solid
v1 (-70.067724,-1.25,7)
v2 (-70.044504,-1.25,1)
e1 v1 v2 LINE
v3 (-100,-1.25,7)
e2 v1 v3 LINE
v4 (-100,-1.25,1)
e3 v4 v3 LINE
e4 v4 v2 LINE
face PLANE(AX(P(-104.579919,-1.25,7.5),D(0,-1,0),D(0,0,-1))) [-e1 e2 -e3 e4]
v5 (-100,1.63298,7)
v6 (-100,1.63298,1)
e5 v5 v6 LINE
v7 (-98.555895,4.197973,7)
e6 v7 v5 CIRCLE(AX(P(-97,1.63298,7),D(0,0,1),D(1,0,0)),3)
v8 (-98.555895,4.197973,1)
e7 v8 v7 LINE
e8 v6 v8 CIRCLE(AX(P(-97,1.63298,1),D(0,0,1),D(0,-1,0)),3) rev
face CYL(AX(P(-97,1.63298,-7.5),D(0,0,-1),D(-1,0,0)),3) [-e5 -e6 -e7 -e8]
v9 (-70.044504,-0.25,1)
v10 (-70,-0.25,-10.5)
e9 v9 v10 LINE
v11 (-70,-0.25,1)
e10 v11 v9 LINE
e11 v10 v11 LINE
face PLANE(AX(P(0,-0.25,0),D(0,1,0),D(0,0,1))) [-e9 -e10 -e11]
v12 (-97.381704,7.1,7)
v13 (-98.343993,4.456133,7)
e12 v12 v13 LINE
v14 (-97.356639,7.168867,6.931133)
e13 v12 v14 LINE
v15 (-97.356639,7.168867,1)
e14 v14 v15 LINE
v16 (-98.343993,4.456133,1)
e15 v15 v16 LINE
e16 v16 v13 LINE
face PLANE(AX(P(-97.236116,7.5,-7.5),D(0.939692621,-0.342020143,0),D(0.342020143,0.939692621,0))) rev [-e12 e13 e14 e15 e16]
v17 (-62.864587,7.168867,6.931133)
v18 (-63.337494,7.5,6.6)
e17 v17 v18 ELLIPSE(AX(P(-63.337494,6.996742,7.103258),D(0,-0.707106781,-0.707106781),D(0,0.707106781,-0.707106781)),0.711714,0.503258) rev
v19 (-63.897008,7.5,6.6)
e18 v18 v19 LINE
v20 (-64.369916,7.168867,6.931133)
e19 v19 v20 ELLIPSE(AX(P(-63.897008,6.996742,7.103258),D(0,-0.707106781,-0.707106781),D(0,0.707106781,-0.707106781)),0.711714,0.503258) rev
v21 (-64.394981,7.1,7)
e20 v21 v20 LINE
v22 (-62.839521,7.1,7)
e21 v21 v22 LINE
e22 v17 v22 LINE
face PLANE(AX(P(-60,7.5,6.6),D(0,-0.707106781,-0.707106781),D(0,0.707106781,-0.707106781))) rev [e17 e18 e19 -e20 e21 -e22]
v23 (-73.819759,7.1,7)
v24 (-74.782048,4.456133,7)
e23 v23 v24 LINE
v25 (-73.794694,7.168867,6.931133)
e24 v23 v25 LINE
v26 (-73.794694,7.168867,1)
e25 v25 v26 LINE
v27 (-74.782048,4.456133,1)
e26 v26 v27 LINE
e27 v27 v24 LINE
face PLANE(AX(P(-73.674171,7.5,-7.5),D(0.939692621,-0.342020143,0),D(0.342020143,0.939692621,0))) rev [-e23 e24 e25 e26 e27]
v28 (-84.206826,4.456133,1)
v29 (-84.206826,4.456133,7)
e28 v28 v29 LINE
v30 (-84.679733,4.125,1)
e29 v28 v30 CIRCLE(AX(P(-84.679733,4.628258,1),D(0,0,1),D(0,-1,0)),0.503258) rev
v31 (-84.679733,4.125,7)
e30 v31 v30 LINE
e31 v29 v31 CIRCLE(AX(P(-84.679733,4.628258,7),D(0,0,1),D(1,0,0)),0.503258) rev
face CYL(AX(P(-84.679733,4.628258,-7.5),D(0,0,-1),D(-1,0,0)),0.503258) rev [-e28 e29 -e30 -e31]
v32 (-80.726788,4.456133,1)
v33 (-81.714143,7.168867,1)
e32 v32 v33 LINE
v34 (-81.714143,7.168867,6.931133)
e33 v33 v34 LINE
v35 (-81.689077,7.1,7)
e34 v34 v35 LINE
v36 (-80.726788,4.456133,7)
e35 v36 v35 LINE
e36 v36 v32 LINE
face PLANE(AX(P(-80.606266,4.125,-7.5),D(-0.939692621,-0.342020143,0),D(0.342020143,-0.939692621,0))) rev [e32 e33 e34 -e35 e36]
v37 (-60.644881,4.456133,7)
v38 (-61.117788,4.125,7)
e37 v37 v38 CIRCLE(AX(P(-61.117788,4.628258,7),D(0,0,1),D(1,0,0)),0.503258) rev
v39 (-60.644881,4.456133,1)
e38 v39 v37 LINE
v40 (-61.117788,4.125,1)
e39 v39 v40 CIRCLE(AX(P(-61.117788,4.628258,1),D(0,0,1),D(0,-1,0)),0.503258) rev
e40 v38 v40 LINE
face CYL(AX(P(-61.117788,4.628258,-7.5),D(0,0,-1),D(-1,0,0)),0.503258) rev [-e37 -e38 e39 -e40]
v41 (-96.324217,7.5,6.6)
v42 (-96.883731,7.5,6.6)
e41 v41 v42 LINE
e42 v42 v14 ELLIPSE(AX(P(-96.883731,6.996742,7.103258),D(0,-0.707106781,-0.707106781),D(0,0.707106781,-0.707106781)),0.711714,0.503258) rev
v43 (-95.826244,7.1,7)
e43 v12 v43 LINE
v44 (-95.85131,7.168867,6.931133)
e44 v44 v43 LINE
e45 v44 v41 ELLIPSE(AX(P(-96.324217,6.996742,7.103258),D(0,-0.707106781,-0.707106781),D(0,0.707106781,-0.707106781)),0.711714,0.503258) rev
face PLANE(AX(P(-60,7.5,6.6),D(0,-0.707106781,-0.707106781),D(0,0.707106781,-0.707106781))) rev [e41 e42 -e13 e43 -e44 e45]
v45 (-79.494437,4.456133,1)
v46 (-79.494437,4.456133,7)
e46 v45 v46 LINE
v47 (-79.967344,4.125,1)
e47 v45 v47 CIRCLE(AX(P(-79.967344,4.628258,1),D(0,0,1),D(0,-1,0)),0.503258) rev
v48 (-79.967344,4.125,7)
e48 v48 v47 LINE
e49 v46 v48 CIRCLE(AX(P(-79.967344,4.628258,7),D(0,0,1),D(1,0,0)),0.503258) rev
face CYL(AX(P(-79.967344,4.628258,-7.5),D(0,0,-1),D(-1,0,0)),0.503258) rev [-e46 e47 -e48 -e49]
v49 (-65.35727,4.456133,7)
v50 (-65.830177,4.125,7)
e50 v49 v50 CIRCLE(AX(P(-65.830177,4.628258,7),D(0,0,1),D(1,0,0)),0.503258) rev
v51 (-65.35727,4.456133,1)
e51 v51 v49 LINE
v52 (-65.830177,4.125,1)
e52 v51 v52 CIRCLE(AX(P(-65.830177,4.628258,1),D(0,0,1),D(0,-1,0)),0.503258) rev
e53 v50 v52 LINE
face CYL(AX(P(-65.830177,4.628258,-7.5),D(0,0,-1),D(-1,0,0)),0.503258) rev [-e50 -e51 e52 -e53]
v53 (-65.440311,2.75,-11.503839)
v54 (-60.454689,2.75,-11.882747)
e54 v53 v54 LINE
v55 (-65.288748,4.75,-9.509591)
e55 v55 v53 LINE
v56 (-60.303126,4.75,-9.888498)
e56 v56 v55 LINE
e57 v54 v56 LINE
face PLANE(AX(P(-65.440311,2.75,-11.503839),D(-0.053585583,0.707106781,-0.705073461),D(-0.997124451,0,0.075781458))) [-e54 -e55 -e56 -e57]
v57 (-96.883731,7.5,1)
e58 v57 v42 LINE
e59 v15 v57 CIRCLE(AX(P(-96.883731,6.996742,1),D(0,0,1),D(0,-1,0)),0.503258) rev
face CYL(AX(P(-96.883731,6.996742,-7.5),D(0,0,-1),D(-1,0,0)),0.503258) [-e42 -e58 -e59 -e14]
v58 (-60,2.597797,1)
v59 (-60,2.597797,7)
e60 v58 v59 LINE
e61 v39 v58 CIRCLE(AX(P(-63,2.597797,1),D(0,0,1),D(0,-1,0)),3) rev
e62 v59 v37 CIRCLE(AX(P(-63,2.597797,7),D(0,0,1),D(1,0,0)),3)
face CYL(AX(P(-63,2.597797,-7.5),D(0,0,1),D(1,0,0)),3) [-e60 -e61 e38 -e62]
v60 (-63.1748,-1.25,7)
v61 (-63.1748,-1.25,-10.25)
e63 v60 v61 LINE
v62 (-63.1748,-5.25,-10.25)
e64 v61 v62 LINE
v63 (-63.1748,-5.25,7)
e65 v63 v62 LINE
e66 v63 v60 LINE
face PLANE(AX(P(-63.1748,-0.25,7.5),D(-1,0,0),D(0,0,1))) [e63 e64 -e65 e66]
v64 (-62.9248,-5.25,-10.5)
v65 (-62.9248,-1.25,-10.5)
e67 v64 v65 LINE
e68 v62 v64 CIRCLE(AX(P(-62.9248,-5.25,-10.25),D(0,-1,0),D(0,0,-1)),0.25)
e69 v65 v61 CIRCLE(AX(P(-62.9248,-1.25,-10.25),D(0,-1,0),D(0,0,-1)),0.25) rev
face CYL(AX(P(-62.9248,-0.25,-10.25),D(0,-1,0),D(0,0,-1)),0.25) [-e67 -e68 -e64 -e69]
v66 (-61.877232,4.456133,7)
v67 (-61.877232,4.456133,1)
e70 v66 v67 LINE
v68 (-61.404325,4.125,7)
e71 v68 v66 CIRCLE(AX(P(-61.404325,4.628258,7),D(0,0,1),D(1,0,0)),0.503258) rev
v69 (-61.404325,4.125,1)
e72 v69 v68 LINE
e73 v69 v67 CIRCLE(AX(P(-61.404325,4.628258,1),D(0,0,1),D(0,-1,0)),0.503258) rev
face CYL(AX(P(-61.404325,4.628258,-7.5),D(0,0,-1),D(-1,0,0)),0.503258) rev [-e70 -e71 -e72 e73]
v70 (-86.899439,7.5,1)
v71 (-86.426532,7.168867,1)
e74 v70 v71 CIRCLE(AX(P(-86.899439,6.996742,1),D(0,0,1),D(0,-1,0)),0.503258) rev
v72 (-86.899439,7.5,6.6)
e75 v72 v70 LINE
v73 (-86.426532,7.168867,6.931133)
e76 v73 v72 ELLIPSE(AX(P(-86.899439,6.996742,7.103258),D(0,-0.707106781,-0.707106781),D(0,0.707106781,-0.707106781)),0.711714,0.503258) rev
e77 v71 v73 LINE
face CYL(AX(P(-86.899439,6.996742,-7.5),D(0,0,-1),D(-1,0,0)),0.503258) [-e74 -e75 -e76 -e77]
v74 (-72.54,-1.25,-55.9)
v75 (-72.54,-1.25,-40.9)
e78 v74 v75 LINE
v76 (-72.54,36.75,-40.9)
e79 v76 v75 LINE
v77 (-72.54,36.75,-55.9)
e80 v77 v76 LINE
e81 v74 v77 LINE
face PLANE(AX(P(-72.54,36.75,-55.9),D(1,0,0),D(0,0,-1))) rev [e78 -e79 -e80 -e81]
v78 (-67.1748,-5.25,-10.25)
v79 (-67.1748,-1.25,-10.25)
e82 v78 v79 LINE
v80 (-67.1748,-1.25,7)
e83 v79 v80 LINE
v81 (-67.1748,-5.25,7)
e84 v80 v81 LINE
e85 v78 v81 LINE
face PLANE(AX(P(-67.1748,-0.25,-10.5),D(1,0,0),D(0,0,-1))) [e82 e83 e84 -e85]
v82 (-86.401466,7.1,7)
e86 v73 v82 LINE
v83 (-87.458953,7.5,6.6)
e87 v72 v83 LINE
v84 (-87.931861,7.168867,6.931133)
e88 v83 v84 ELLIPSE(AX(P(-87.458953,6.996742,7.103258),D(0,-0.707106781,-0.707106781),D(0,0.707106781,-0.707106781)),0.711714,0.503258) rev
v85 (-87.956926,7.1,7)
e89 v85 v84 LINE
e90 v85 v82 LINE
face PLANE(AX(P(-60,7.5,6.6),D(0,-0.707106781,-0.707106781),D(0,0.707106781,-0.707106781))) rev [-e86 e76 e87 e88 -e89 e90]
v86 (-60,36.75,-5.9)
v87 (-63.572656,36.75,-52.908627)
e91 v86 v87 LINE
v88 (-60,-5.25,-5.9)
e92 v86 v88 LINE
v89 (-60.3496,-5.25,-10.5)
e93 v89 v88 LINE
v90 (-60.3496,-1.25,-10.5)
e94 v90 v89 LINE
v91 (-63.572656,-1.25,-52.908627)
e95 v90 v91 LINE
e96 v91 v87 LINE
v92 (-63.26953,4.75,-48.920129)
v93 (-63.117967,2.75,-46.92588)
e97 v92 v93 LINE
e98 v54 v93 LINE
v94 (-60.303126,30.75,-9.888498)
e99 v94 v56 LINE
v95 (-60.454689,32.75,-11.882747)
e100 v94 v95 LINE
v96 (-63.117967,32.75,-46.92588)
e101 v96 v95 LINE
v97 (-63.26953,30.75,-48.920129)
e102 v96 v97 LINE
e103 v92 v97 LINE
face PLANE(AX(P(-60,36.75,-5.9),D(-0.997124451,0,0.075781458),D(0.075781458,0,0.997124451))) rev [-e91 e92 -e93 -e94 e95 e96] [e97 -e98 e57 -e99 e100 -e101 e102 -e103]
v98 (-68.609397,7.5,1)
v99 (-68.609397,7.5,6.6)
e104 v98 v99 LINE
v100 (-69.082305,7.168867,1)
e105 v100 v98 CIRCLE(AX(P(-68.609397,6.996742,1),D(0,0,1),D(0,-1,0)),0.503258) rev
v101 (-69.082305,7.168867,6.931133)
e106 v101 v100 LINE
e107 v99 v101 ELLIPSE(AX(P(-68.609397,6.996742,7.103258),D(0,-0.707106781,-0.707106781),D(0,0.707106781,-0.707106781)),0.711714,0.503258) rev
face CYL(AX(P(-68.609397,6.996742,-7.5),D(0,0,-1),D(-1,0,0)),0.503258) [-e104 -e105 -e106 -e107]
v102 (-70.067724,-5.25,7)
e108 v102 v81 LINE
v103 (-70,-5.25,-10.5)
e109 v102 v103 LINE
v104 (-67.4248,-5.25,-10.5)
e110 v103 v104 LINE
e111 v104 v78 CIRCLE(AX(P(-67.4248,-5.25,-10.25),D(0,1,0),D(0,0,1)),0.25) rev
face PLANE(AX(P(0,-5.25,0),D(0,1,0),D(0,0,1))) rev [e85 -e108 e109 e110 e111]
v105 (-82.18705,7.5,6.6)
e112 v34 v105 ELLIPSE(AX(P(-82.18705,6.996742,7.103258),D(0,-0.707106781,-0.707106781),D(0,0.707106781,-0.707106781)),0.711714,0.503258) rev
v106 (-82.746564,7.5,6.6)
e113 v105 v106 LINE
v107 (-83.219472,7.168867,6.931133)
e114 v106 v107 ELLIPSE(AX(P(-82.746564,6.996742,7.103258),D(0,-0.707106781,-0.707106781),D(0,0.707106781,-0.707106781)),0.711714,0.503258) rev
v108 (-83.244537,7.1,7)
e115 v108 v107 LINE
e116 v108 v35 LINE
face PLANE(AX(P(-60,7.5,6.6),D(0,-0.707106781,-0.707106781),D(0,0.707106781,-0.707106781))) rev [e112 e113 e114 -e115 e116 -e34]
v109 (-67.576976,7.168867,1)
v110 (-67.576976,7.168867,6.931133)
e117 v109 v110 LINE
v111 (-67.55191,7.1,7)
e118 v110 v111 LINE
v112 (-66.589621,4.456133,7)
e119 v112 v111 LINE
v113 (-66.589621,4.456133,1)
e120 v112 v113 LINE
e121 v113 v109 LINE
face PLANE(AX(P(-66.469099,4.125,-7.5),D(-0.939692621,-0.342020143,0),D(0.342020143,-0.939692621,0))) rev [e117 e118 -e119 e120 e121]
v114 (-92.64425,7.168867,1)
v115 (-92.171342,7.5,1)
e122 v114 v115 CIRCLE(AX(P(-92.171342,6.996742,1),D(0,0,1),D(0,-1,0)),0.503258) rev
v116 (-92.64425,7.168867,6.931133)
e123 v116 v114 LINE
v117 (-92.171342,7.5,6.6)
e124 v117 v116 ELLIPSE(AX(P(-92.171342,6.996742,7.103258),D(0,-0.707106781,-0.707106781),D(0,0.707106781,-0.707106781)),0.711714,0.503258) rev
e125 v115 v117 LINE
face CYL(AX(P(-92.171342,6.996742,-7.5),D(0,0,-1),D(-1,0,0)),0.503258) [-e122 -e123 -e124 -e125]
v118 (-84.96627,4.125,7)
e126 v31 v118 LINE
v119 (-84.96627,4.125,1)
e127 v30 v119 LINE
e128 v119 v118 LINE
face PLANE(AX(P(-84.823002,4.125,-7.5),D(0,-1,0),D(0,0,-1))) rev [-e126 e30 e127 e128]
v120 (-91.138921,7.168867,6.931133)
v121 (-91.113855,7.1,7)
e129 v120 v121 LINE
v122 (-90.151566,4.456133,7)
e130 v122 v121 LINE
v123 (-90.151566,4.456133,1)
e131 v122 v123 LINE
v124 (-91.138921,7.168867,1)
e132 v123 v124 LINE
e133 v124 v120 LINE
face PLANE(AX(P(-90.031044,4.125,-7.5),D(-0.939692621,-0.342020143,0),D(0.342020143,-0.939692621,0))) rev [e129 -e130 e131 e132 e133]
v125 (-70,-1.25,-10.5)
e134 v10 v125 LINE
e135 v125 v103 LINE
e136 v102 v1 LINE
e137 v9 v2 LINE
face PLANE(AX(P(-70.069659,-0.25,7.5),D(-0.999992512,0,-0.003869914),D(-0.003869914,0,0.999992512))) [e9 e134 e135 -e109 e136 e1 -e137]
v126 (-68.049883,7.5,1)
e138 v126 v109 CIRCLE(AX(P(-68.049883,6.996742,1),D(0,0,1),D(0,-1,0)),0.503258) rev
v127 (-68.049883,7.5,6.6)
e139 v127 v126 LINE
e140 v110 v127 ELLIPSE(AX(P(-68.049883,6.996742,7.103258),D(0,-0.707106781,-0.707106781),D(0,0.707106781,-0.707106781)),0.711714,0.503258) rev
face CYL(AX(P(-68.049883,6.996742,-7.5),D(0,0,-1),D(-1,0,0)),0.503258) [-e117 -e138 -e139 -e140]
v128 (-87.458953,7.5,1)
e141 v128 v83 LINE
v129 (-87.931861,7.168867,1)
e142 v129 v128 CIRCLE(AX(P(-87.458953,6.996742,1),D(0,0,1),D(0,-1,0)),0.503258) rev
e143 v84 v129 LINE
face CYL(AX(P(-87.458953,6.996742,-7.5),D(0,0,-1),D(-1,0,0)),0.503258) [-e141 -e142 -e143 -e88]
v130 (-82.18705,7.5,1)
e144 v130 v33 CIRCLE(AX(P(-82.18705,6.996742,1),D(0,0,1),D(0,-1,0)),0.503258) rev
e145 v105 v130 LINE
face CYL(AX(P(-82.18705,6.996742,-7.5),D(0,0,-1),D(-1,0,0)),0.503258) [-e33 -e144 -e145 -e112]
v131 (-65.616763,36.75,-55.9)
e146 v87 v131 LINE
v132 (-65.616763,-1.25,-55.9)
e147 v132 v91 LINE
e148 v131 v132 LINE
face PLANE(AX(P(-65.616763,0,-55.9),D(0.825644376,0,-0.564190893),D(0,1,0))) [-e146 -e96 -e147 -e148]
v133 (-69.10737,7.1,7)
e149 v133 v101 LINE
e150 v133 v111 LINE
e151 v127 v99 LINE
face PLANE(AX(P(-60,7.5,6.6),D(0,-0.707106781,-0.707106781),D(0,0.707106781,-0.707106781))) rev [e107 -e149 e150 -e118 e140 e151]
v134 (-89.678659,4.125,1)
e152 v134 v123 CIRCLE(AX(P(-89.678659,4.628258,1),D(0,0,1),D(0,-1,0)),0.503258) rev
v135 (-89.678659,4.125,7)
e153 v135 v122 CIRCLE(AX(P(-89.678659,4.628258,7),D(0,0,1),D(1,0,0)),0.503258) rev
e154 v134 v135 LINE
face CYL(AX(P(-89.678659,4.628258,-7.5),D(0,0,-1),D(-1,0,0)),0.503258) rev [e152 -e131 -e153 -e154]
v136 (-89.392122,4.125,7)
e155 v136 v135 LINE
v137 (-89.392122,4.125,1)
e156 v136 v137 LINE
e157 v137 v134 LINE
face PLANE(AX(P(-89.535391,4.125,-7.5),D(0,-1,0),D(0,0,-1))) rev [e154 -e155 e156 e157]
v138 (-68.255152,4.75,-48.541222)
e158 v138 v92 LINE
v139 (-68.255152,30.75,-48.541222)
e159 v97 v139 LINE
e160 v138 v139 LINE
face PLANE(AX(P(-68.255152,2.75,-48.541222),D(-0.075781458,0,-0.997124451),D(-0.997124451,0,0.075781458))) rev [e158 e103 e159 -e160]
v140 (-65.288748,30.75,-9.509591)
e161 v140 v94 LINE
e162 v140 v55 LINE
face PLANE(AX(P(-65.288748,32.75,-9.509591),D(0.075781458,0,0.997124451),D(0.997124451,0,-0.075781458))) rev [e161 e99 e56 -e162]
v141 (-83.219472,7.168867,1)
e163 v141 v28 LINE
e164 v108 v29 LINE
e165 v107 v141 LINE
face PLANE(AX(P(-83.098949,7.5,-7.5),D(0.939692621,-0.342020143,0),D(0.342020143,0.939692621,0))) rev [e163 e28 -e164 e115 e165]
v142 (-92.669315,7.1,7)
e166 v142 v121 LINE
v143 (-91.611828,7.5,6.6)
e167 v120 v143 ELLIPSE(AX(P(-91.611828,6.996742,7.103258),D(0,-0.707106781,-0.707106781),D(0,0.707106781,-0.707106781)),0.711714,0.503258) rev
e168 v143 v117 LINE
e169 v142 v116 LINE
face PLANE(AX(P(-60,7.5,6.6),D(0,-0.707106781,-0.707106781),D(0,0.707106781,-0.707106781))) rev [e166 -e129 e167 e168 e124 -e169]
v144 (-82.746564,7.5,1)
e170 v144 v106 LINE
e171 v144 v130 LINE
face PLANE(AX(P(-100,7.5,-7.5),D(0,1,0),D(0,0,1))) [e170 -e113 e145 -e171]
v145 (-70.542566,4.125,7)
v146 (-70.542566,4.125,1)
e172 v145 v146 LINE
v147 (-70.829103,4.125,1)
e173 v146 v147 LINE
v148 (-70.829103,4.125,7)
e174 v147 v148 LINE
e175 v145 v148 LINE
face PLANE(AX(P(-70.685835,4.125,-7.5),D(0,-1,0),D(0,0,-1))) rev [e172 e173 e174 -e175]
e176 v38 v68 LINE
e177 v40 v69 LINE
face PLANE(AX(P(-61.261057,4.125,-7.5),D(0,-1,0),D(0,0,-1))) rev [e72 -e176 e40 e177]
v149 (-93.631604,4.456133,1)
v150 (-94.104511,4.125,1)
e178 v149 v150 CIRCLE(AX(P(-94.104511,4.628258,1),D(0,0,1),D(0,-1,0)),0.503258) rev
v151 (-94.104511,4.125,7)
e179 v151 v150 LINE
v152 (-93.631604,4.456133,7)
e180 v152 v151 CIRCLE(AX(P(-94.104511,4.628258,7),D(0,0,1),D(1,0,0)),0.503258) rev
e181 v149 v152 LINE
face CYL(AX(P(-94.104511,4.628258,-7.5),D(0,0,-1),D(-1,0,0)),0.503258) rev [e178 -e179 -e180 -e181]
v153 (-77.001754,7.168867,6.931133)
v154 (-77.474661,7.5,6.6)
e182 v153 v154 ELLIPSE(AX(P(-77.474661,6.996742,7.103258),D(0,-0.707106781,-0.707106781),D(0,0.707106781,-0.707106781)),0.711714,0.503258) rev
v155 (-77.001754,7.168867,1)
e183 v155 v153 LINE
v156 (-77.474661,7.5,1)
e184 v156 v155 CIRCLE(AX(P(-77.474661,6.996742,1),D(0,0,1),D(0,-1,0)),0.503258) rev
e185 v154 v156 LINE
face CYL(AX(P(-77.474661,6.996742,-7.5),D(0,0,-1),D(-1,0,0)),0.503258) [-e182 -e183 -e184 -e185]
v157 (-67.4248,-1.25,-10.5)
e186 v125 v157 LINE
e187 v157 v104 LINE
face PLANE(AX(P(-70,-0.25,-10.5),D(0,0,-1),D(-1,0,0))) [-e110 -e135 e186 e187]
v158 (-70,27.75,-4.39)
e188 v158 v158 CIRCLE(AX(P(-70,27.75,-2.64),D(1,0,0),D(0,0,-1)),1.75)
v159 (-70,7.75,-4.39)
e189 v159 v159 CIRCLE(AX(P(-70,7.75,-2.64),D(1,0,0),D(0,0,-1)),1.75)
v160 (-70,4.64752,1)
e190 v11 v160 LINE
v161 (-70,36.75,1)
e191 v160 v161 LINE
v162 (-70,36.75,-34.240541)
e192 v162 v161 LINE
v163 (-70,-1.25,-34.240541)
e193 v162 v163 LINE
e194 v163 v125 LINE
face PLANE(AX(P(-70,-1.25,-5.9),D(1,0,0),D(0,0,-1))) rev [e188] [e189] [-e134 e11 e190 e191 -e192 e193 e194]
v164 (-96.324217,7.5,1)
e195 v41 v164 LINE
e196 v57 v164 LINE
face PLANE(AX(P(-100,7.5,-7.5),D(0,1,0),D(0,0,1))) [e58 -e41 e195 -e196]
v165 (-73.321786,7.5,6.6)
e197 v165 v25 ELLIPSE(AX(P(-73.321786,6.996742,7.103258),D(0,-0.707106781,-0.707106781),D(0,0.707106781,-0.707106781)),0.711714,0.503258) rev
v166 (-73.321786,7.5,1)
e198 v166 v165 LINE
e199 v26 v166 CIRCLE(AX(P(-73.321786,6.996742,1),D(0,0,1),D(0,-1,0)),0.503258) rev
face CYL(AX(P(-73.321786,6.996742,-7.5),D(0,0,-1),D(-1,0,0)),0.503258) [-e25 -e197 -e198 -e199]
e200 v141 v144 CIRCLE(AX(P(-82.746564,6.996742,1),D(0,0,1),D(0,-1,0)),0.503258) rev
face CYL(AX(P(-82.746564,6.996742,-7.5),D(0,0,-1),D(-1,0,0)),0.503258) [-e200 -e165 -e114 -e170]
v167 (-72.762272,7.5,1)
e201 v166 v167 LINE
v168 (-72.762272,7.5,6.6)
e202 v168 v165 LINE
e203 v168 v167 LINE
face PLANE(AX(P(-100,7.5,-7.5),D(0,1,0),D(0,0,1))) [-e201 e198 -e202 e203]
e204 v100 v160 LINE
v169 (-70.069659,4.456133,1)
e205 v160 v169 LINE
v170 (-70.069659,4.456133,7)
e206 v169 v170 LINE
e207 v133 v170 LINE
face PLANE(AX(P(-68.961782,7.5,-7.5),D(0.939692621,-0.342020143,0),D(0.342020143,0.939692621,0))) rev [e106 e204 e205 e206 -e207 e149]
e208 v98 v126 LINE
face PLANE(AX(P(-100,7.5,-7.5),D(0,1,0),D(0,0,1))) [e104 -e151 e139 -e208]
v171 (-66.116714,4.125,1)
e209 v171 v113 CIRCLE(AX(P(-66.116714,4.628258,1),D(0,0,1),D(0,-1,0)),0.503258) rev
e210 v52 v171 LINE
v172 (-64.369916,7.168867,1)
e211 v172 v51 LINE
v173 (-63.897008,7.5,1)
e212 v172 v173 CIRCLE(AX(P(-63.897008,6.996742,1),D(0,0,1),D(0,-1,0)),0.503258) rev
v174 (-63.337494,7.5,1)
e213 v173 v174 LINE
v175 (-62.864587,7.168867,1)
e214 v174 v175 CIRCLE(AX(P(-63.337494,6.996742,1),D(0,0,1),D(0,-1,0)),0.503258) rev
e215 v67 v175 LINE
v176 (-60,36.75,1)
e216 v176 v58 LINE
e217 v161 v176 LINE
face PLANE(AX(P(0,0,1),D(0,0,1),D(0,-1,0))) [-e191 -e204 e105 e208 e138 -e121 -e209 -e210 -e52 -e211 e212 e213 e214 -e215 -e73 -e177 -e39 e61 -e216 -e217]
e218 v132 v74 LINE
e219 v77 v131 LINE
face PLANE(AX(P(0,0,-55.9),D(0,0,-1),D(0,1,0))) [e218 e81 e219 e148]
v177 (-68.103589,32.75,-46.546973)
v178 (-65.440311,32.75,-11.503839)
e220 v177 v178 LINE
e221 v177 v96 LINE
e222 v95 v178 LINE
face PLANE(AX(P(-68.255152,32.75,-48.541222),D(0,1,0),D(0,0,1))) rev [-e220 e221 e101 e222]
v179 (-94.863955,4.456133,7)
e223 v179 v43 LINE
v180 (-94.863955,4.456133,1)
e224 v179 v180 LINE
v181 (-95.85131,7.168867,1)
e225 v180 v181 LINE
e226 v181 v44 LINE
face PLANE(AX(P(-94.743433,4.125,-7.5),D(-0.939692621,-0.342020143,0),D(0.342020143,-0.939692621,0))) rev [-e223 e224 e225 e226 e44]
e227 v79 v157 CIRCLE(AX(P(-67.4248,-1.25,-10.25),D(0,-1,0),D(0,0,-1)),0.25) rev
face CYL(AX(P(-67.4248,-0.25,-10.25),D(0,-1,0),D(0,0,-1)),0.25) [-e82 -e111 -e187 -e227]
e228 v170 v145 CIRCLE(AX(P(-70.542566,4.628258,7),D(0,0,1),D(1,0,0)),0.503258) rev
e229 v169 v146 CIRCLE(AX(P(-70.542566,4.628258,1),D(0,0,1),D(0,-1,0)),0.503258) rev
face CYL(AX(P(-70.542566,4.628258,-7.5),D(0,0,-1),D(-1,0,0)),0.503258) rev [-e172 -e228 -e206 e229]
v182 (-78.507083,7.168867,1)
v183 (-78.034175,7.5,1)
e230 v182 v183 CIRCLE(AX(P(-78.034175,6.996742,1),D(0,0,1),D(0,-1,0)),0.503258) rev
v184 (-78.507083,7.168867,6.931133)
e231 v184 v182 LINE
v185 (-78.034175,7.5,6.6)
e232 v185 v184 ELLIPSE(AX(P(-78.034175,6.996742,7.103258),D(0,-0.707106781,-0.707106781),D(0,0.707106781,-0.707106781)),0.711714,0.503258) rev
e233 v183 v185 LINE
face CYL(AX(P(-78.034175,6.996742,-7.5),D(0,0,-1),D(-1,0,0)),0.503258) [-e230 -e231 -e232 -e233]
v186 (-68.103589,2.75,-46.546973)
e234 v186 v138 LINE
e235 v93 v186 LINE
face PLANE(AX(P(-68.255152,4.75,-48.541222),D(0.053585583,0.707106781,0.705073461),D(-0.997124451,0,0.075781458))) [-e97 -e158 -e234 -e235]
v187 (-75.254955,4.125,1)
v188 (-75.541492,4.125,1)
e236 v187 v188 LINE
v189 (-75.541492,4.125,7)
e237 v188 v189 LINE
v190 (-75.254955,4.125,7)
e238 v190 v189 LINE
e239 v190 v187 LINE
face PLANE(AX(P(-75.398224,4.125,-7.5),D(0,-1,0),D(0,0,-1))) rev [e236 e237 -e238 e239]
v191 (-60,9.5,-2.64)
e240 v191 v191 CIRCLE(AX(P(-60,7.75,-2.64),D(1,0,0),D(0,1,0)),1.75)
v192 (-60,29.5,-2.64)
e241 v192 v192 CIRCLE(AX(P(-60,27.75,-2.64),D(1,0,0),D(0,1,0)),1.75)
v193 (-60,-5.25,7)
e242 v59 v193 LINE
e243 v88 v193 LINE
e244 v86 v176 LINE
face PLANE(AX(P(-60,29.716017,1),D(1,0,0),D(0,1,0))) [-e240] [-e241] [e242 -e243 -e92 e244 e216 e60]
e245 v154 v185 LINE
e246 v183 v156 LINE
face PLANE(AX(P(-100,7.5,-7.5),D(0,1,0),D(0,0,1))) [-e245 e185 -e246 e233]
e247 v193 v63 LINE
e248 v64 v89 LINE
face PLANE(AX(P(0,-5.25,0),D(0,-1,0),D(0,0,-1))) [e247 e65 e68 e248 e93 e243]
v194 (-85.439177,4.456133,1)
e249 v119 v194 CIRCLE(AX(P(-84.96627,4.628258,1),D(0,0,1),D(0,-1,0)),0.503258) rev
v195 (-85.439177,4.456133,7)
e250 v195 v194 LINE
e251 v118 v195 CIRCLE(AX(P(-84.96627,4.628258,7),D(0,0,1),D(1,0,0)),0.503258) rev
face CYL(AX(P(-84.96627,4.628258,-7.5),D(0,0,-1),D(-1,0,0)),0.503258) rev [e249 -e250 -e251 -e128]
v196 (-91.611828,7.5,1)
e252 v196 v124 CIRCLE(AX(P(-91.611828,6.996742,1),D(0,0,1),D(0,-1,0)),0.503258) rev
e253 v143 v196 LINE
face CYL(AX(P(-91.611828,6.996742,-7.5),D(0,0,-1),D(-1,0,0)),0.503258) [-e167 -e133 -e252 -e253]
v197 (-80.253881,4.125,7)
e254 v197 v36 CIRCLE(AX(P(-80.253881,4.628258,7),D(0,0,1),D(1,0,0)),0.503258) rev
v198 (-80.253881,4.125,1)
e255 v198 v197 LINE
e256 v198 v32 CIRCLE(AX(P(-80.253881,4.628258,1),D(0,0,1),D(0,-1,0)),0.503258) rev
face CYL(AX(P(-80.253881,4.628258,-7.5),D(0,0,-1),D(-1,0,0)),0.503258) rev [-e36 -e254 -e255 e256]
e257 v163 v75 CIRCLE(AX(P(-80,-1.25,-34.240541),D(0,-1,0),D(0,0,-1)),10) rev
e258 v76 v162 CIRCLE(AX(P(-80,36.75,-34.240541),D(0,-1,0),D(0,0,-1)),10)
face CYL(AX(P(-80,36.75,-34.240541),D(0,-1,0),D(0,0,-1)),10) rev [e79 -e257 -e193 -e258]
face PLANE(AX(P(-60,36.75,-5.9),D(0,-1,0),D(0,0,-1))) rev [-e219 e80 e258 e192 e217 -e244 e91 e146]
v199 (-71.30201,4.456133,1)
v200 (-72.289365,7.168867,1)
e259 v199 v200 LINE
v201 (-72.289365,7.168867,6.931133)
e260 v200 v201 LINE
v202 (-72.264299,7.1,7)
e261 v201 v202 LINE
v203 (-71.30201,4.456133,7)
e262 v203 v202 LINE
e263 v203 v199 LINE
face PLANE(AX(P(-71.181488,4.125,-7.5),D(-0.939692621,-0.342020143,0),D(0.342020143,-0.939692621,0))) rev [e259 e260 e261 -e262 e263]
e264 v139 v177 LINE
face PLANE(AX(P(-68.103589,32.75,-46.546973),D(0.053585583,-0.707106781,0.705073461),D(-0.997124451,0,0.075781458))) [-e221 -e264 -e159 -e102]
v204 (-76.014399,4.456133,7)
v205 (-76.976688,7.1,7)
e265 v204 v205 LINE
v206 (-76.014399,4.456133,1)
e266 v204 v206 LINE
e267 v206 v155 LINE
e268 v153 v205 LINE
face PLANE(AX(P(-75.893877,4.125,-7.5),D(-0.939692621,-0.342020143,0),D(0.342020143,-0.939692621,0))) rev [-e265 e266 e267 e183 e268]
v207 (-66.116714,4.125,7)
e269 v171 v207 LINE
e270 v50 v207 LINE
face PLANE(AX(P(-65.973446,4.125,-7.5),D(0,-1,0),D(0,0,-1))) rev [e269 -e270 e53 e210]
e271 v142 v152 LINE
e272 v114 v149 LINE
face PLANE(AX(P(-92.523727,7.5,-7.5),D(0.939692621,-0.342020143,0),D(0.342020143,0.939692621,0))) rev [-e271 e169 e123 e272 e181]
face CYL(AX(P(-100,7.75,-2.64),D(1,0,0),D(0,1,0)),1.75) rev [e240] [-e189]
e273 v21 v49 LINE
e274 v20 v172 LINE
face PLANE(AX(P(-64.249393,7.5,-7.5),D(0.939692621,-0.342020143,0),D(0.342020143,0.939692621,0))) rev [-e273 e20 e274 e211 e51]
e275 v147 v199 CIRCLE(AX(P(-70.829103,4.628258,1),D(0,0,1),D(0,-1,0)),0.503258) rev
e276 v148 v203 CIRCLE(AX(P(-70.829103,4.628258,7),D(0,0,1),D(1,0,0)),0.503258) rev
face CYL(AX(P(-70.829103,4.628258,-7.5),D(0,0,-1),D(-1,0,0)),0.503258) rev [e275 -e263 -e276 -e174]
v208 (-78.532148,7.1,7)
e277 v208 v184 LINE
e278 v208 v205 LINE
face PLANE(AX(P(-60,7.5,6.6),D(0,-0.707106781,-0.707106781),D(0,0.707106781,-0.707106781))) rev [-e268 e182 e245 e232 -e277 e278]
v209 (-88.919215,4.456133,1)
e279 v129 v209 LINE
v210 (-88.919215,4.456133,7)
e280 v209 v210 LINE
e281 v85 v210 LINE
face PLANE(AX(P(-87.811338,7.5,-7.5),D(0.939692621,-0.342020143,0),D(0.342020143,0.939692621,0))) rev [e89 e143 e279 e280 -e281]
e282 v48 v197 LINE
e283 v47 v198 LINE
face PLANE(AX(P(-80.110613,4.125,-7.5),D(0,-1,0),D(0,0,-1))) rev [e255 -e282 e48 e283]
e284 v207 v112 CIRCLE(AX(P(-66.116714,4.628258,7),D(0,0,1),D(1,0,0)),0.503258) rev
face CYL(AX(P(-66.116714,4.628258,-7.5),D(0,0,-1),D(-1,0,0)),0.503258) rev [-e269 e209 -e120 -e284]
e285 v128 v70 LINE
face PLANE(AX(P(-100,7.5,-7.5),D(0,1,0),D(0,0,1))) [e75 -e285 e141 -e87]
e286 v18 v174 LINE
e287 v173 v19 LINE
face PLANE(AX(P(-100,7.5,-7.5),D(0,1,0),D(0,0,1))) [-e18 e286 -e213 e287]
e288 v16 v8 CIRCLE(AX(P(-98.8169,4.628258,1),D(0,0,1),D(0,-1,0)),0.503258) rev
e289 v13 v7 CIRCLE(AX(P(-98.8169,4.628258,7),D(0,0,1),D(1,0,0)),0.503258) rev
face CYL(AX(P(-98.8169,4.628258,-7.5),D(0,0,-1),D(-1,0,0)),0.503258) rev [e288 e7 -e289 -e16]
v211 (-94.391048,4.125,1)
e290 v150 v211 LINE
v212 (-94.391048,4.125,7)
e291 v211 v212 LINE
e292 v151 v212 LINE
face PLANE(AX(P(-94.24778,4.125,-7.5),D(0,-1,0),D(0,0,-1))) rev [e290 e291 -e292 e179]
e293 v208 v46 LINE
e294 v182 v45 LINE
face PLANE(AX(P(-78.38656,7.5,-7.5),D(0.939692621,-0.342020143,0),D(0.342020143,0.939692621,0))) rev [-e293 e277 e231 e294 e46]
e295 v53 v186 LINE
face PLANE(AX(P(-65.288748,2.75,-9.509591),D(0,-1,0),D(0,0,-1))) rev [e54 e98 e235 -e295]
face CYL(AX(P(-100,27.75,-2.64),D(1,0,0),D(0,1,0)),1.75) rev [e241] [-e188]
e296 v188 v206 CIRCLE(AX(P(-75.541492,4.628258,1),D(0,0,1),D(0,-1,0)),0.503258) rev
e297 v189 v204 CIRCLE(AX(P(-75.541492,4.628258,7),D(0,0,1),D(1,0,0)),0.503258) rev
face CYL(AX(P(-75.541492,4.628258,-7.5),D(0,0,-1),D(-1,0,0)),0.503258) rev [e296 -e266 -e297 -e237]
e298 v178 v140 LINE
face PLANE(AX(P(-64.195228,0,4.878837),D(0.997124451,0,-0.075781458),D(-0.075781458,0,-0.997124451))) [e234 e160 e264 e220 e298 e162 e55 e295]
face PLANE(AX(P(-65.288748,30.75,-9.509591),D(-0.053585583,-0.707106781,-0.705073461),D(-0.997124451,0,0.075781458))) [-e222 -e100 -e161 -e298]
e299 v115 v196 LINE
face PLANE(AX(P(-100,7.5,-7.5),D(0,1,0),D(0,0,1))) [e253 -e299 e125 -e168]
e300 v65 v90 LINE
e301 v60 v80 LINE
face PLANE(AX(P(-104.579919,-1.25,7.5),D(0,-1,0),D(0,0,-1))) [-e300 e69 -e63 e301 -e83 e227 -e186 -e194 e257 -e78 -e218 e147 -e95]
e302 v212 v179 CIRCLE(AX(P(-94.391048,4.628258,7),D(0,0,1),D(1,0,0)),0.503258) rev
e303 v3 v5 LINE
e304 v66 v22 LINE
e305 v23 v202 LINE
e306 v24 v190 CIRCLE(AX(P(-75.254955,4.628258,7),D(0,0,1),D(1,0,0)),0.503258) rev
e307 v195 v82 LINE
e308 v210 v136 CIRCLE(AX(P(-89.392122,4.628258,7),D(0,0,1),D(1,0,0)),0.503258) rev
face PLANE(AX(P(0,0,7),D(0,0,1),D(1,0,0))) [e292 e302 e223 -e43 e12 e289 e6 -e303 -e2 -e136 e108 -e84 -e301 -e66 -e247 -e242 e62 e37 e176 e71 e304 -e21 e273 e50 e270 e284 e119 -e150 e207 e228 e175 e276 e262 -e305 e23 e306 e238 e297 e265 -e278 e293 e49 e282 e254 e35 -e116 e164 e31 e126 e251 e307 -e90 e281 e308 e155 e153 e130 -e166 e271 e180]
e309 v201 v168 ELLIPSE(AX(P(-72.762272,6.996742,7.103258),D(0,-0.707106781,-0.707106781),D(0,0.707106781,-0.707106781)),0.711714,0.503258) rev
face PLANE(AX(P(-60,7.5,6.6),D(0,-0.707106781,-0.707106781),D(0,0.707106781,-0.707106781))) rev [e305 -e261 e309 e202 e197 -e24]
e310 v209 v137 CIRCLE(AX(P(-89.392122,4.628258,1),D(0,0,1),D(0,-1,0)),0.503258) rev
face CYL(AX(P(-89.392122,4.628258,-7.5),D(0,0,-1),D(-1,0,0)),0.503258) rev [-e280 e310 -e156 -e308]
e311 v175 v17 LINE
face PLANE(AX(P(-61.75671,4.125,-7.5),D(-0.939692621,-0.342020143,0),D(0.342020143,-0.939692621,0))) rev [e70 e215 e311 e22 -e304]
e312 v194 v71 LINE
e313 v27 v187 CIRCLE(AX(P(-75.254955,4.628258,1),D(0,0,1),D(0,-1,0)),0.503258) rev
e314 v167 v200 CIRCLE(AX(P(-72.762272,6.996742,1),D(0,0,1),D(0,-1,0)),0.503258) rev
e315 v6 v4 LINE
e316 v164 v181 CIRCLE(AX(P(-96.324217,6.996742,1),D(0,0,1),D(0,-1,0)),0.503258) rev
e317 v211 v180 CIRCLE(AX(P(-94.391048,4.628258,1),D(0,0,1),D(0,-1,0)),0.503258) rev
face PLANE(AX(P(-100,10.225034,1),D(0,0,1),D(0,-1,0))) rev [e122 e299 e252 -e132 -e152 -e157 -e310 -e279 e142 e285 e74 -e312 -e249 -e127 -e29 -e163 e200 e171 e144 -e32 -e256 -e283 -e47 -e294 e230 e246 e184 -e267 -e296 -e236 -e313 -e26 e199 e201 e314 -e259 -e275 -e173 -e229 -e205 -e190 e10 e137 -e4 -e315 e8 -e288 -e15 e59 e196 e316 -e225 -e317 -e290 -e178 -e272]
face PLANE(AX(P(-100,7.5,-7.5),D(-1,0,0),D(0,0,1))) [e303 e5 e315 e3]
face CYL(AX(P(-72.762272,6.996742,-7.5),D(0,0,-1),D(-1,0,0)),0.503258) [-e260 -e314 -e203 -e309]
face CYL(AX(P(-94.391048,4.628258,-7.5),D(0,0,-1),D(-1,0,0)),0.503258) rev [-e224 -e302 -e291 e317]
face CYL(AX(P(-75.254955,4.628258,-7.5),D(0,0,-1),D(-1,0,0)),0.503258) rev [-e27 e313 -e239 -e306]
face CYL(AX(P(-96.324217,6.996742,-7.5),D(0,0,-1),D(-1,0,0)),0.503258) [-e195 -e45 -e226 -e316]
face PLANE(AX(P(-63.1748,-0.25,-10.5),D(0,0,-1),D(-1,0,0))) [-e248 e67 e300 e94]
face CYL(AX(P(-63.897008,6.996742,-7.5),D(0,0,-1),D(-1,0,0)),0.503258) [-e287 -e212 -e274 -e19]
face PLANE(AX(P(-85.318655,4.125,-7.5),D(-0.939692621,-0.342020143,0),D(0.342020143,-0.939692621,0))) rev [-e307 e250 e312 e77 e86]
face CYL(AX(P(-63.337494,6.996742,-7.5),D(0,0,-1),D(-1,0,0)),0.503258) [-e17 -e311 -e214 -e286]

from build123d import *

# Parameters (mm, degrees)
BOSS_EXTRUDE1_DEPTH      = 7.5
BOSS_EXTRUDE1_DEPTH_BACK = 7.5
SKETCH3_W                = 200
SKETCH3_H                = 15
CUT_EXTRUDE1_DEPTH       = 101.560926806
FILLET1_R                = 0.503257554
LPATTERN1_COUNT          = 42
LPATTERN1_PITCH          = 4.71238898
FILLET1_OF_LPATTERN1_R   = 0.503257554
CUT_EXTRUDE2_DEPTH       = 101.560926806
CUT_EXTRUDE2_DEPTH_BACK  = 101.560926806
SKETCH5_W                = 4.71238898
SKETCH5_H                = 3.375
CUT_EXTRUDE3_DEPTH       = 101.560926806
CUT_EXTRUDE3_DEPTH_BACK  = 101.560926806
SKETCH6_W                = 13.890612777
SKETCH6_H                = 21.950597968
CUT_EXTRUDE6_DEPTH       = 101.560926806
CUT_EXTRUDE6_DEPTH_BACK  = 101.560926806
SKETCH8_W                = 175.100830171
SKETCH8_H                = 44.946806771
SKETCH9_W                = 55.501850732
SKETCH9_H                = 10.784038355
CUT_EXTRUDE7_DEPTH       = 101.560926806
SKETCH10_W               = 10
SKETCH10_H               = 38
BOSS_EXTRUDE2_DEPTH      = 6.9
SKETCH11_W               = 12.54
SKETCH11_H               = 38
BOSS_EXTRUDE3_DEPTH      = 50
SKETCH12_W               = 2.54
SKETCH12_H               = 35
CUT_EXTRUDE8_DEPTH       = 121.701325593
CHAMFER1_SIZE            = 3
CHAMFER1_SIZE2           = 1.816762814
FILLET2_R                = 10
SKETCH13_W               = 39.144192087
SKETCH13_H               = 30
CUT_EXTRUDE9_DEPTH       = 5
CHAMFER2_SIZE            = 2
SKETCH14_R               = 1.75
CUT_EXTRUDE10_DEPTH      = 78.944675893
BOSS_EXTRUDE4_DEPTH      = 4
BOSS_EXTRUDE4_DEPTH_BACK = 1
FILLET3_R                = 0.25
SKETCH16_W               = 73.039939744
SKETCH16_H               = 56.96380351
CUT_EXTRUDE11_DEPTH      = 0.5
FILLET5_R                = 3
CUT_EXTRUDE12_DEPTH      = 78.944675893
CUT_EXTRUDE12_DEPTH_BACK = 78.944675893


with BuildPart() as part:
    # Sketch3 → Boss-Extrude1 (new, two sides: drawn at the far end of the back side and taken through both)
    with BuildSketch(Plane.XY.offset(-BOSS_EXTRUDE1_DEPTH_BACK)):
        Rectangle(SKETCH3_W, SKETCH3_H)
    extrude(amount=BOSS_EXTRUDE1_DEPTH + BOSS_EXTRUDE1_DEPTH_BACK)

    # Sketch4 → Cut-Extrude1 (cut, symmetric)
    with BuildSketch(Plane.XY):
        Polygon((-94.247779608, 7.5), (-94.247779608, 4.125), (-94.743432664, 4.125), (-95.971832204, 7.5), align=None)
        Polygon((-97.236115992, 7.5), (-98.464515532, 4.125), (-98.960168588, 4.125), (-98.960168588, 7.5), align=None)
    cut_extrude1 = extrude(amount=CUT_EXTRUDE1_DEPTH, both=True, mode=Mode.SUBTRACT)

    # Fillet1
    fillet1_edges = [part.edges().sort_by_distance(p)[0] for p in [
        (-95.971832204, 7.5, 0),
        (-94.743432664, 4.125, 0),
        (-97.236115992, 7.5, 0),
        (-98.464515532, 4.125, 0),
    ]]
    fillet(fillet1_edges, radius=FILLET1_R)

    # LPattern1: Cut-Extrude1 ×42
    with Locations(*[(i * LPATTERN1_PITCH, 0, 0) for i in range(1, LPATTERN1_COUNT)]):
        add(cut_extrude1, mode=Mode.SUBTRACT)

    # Fillet1 of LPattern1
    fillet1_of_lpattern1_edges = [part.edges().sort_by_distance(p)[0] for p in [
        (-91.259443224, 7.5, 0),
        (-90.031043683, 4.125, 0),
        (-92.523727011, 7.5, 0),
        (-93.752126552, 4.125, 0),
        (-86.547054243, 7.5, 0),
        (-85.318654703, 4.125, 0),
        (-87.811338031, 7.5, 0),
        (-89.039737571, 4.125, 0),
        (-81.834665263, 7.5, 0),
        (-80.606265722, 4.125, 0),
        (-83.09894905, 7.5, 0),
        (-84.327348591, 4.125, 0),
        (-77.122276283, 7.5, 0),
        (-75.893876742, 4.125, 0),
        (-78.38656007, 7.5, 0),
        (-79.614959611, 4.125, 0),
        (-72.409887302, 7.5, 0),
        (-71.181487762, 4.125, 0),
        (-73.67417109, 7.5, 0),
        (-74.90257063, 4.125, 0),
        (-67.697498322, 7.5, 0),
        (-66.469098781, 4.125, 0),
        (-68.961782109, 7.5, 0),
        (-70.19018165, 4.125, 0),
        (-62.985109342, 7.5, 0),
        (-61.756709801, 4.125, 0),
        (-64.249393129, 7.5, 0),
        (-65.47779267, 4.125, 0),
        (-58.272720361, 7.5, 0),
        (-57.04432082, 4.125, 0),
        (-59.537004149, 7.5, 0),
        (-60.765403689, 4.125, 0),
        (-53.560331381, 7.5, 0),
        (-52.33193184, 4.125, 0),
        (-54.824615168, 7.5, 0),
        (-56.053014709, 4.125, 0),
        (-48.8479424, 7.5, 0),
        (-47.61954286, 4.125, 0),
        (-50.112226188, 7.5, 0),
        (-51.340625728, 4.125, 0),
        (-44.13555342, 7.5, 0),
        (-42.907153879, 4.125, 0),
        (-45.399837207, 7.5, 0),
        (-46.628236748, 4.125, 0),
        (-39.42316444, 7.5, 0),
        (-38.194764899, 4.125, 0),
        (-40.687448227, 7.5, 0),
        (-41.915847768, 4.125, 0),
        (-34.710775459, 7.5, 0),
        (-33.482375919, 4.125, 0),
        (-35.975059247, 7.5, 0),
        (-37.203458787, 4.125, 0),
        (-29.998386479, 7.5, 0),
        (-28.769986938, 4.125, 0),
        (-31.262670266, 7.5, 0),
        (-32.491069807, 4.125, 0),
        (-25.285997498, 7.5, 0),
        (-24.057597958, 4.125, 0),
        (-26.550281286, 7.5, 0),
        (-27.778680826, 4.125, 0),
        (-20.573608518, 7.5, 0),
        (-19.345208977, 4.125, 0),
        (-21.837892305, 7.5, 0),
        (-23.066291846, 4.125, 0),
        (-15.861219538, 7.5, 0),
        (-14.632819997, 4.125, 0),
        (-17.125503325, 7.5, 0),
        (-18.353902866, 4.125, 0),
        (-11.148830557, 7.5, 0),
        (-9.920431017, 4.125, 0),
        (-12.413114345, 7.5, 0),
        (-13.641513885, 4.125, 0),
        (-6.436441577, 7.5, 0),
        (-5.208042036, 4.125, 0),
        (-7.700725364, 7.5, 0),
        (-8.929124905, 4.125, 0),
        (-1.724052597, 7.5, 0),
        (-0.495653056, 4.125, 0),
        (-2.988336384, 7.5, 0),
        (-4.216735925, 4.125, 0),
        (2.988336384, 7.5, 0),
        (4.216735925, 4.125, 0),
        (1.724052596, 7.5, 0),
        (0.495653056, 4.125, 0),
        (7.700725364, 7.5, 0),
        (8.929124905, 4.125, 0),
        (6.436441577, 7.5, 0),
        (5.208042036, 4.125, 0),
        (12.413114345, 7.5, 0),
        (13.641513885, 4.125, 0),
        (11.148830557, 7.5, 0),
        (9.920431017, 4.125, 0),
        (17.125503325, 7.5, 0),
        (18.353902866, 4.125, 0),
        (15.861219538, 7.5, 0),
        (14.632819997, 4.125, 0),
        (21.837892305, 7.5, 0),
        (23.066291846, 4.125, 0),
        (20.573608518, 7.5, 0),
        (19.345208977, 4.125, 0),
        (26.550281286, 7.5, 0),
        (27.778680826, 4.125, 0),
        (25.285997498, 7.5, 0),
        (24.057597958, 4.125, 0),
        (31.262670266, 7.5, 0),
        (32.491069807, 4.125, 0),
        (29.998386479, 7.5, 0),
        (28.769986938, 4.125, 0),
        (35.975059247, 7.5, 0),
        (37.203458787, 4.125, 0),
        (34.710775459, 7.5, 0),
        (33.482375919, 4.125, 0),
        (40.687448227, 7.5, 0),
        (41.915847768, 4.125, 0),
        (39.42316444, 7.5, 0),
        (38.194764899, 4.125, 0),
        (45.399837207, 7.5, 0),
        (46.628236748, 4.125, 0),
        (44.13555342, 7.5, 0),
        (42.907153879, 4.125, 0),
        (50.112226188, 7.5, 0),
        (51.340625728, 4.125, 0),
        (48.8479424, 7.5, 0),
        (47.61954286, 4.125, 0),
        (54.824615168, 7.5, 0),
        (56.053014709, 4.125, 0),
        (53.560331381, 7.5, 0),
        (52.33193184, 4.125, 0),
        (59.537004148, 7.5, 0),
        (60.765403689, 4.125, 0),
        (58.272720361, 7.5, 0),
        (57.04432082, 4.125, 0),
        (64.249393129, 7.5, 0),
        (65.47779267, 4.125, 0),
        (62.985109341, 7.5, 0),
        (61.756709801, 4.125, 0),
        (68.961782109, 7.5, 0),
        (70.19018165, 4.125, 0),
        (67.697498322, 7.5, 0),
        (66.469098781, 4.125, 0),
        (73.67417109, 7.5, 0),
        (74.90257063, 4.125, 0),
        (72.409887302, 7.5, 0),
        (71.181487762, 4.125, 0),
        (78.38656007, 7.5, 0),
        (79.614959611, 4.125, 0),
        (77.122276283, 7.5, 0),
        (75.893876742, 4.125, 0),
        (83.09894905, 7.5, 0),
        (84.327348591, 4.125, 0),
        (81.834665263, 7.5, 0),
        (80.606265722, 4.125, 0),
        (87.811338031, 7.5, 0),
        (89.039737571, 4.125, 0),
        (86.547054243, 7.5, 0),
        (85.318654703, 4.125, 0),
        (92.523727011, 7.5, 0),
        (93.752126552, 4.125, 0),
        (91.259443224, 7.5, 0),
        (90.031043683, 4.125, 0),
        (97.236115992, 7.5, 0),
        (98.464515532, 4.125, 0),
        (95.971832204, 7.5, 0),
        (94.743432664, 4.125, 0),
    ]]
    fillet(fillet1_of_lpattern1_edges, radius=FILLET1_OF_LPATTERN1_R)

    # Sketch5 → Cut-Extrude2 (cut, two sides: drawn at the far end of the back side and taken through both)
    with BuildSketch(Plane.XY.offset(-CUT_EXTRUDE2_DEPTH_BACK)):
        with Locations((-101.316363078, 5.8125)):
            Rectangle(SKETCH5_W, SKETCH5_H)
        with Locations((101.316363078, 5.8125)):
            Rectangle(SKETCH5_W, SKETCH5_H)
    extrude(amount=CUT_EXTRUDE2_DEPTH + CUT_EXTRUDE2_DEPTH_BACK, mode=Mode.SUBTRACT)

    # Sketch6 → Cut-Extrude3 (cut, two sides: drawn at the far end of the back side and taken through both)
    with BuildSketch(Plane(origin=(0, 0, 0), x_dir=(0, 0, -1), z_dir=(1, 0, 0)).offset(-CUT_EXTRUDE3_DEPTH_BACK)):
        with Locations((5.945306389, -0.750264579)):
            Rectangle(SKETCH6_W, SKETCH6_H)
    extrude(amount=CUT_EXTRUDE3_DEPTH + CUT_EXTRUDE3_DEPTH_BACK, mode=Mode.SUBTRACT)

    # Sketch8 → Cut-Extrude6 (cut, two sides: drawn at the far end of the back side and taken through both)
    with BuildSketch(Plane.XY.offset(-CUT_EXTRUDE6_DEPTH_BACK)):
        with Locations((27.550415086, 7.242613414)):
            Rectangle(SKETCH8_W, SKETCH8_H)
    extrude(amount=CUT_EXTRUDE6_DEPTH + CUT_EXTRUDE6_DEPTH_BACK, mode=Mode.SUBTRACT)

    # Sketch9 → Cut-Extrude7 (cut, through all)
    with BuildSketch(Plane.XY):
        with Locations((-76.828993169, -6.642019178)):
            Rectangle(SKETCH9_W, SKETCH9_H)
    extrude(amount=CUT_EXTRUDE7_DEPTH, mode=Mode.SUBTRACT)

    # Sketch10 → Boss-Extrude2 (add)
    with BuildSketch(Plane(origin=(0, 0, 1), x_dir=(-1, 0, 0), z_dir=(0, 0, -1))):
        with Locations((65, 17.75)):
            Rectangle(SKETCH10_W, SKETCH10_H)
    extrude(amount=BOSS_EXTRUDE2_DEPTH)

    # Sketch11 → Boss-Extrude3 (add)
    with BuildSketch(Plane(origin=(0, 0, -5.9), x_dir=(-1, 0, 0), z_dir=(0, 0, -1))):
        with Locations((66.27, 17.75)):
            Rectangle(SKETCH11_W, SKETCH11_H)
    extrude(amount=BOSS_EXTRUDE3_DEPTH)

    # Sketch12 → Cut-Extrude8 (cut, through all)
    with BuildSketch(Plane.XZ.offset(1.25)):
        with Locations((-71.27, -23.4)):
            Rectangle(SKETCH12_W, SKETCH12_H)
        Polygon((-60, -5.9), (-63.8, -55.9), (-60, -55.9), align=None)
    extrude(amount=-CUT_EXTRUDE8_DEPTH, mode=Mode.SUBTRACT)

    # Chamfer1
    chamfer1_edges = [part.edges().sort_by_distance(p)[0] for p in [
        (-63.8, 17.75, -55.9),
    ]]
    chamfer1_side = [part.faces().sort_by_distance(p)[0] for p in [
        (-61.9, 17.75, -30.9),
    ]]
    chamfer(chamfer1_edges, length=CHAMFER1_SIZE, length2=CHAMFER1_SIZE2, reference=chamfer1_side[0])

    # Fillet2
    # the kernel refuses this fillet: 10 mm, written as the material it adds along each edge
    with BuildSketch(Plane(origin=(-70, -1.25, -40.9), x_dir=(-1, 0, 0), z_dir=(0, 1, 0))) as fillet2_piece_1:
        with BuildLine():
            CenterArc((10, 6.659459438), FILLET2_R, 180, 41.754936598)
            Line((0, 6.659459438), (-0.2, 6.659459438))
            Line((-0.2, 6.659459438), (-0.2, 0))
            Line((-0.2, 0), (0, -0.2))
            ThreePointArc((0, -0.2), (1.27, -0.2), (2.3908, -0.133189189))
            Line((2.3908, -0.133189189), (2.54, 0))
        make_face()
    extrude(amount=38)

    # Sketch13 → Cut-Extrude9 (cut)
    with BuildSketch(Plane(origin=(-59.20960532, 0, 4.499930004), x_dir=(-0.07578145826840343, 0, -0.997124450900044), z_dir=(0.997124450900044, 0, -0.07578145826840343))):
        with Locations((34.0020178, 17.75)):
            Rectangle(SKETCH13_W, SKETCH13_H)
    extrude(amount=-CUT_EXTRUDE9_DEPTH, mode=Mode.SUBTRACT)

    # Chamfer2
    chamfer2_edges = [part.edges().sort_by_distance(p)[0] for p in [
        (-62.79593696, 2.75, -9.699044158),
        (-62.79593696, 32.75, -9.699044158),
        (-65.762340919, 32.75, -48.730675198),
        (-65.762340919, 2.75, -48.730675198),
    ]]
    chamfer(chamfer2_edges, length=CHAMFER2_SIZE)

    # Sketch14 → Cut-Extrude10 (cut, through all)
    with BuildSketch(Plane(origin=(-60, 0, 0), x_dir=(0, 0, -1), z_dir=(1, 0, 0))):
        with Locations(Location((2.64, 27.75, 0), (0, 0, 90))):
            Circle(SKETCH14_R)
        with Locations(Location((2.64, 7.75, 0), (0, 0, 90))):
            Circle(SKETCH14_R)
    extrude(amount=-CUT_EXTRUDE10_DEPTH, mode=Mode.SUBTRACT)

    # Sketch15 → Boss-Extrude4 (add, two sides: drawn at the far end of the back side and taken through both)
    with BuildSketch(Plane.XZ.offset(1.25).offset(-BOSS_EXTRUDE4_DEPTH_BACK)):
        Polygon((-70.069658973, 7.5), (-70, -10.5), (-67.1748, -10.5), (-67.1748, 7.5), align=None)
        Polygon((-60, -5.9), (-60, 7.5), (-63.1748, 7.5), (-63.1748, -10.5), (-60.3496, -10.5), align=None)
    extrude(amount=BOSS_EXTRUDE4_DEPTH + BOSS_EXTRUDE4_DEPTH_BACK)

    # Fillet3
    fillet3_edges = [part.edges().sort_by_distance(p)[0] for p in [
        (-67.1748, -3.25, 7.5),
        (-67.1748, -3.25, -10.5),
        (-63.1748, -3.25, -10.5),
        (-63.1748, -3.25, 7.5),
    ]]
    fillet(fillet3_edges, radius=FILLET3_R)

    # Sketch16 → Cut-Extrude11 (cut)
    with BuildSketch(Plane.XY.offset(7.5)):
        with Locations((-72.750010193, 7.574608655)):
            Rectangle(SKETCH16_W, SKETCH16_H)
    extrude(amount=-CUT_EXTRUDE11_DEPTH, mode=Mode.SUBTRACT)

    # Fillet5
    # the kernel refuses this fillet: 3 mm, written as the material it takes off along each edge
    with BuildSketch(Plane(origin=(-100, 4.125, -5.230049704), x_dir=(0.9987257002687598, 0.05046757000961256, 0), z_dir=(0, 0, 1))) as fillet5_piece_1:
        with BuildLine():
            CenterArc((2.870410913, -2.640247011), FILLET5_R, 118.347702704, 58.759489659)
            Line((-0.125766188, -2.488844301), (-0.425383898, -2.47370403))
            Line((-0.425383898, -2.47370403), (-0.29961771, 0.015140271))
            Line((-0.29961771, 0.015140271), (0.015140271, 0.29961771))
            ThreePointArc((0.015140271, 0.29961771), (1.196732382, 0.239909541), (1.303501273, 0.264024701))
            Line((1.303501273, 0.264024701), (1.445947604, 0))
        make_face()
    extrude(amount=18.460099408, mode=Mode.SUBTRACT)
    with BuildSketch(Plane(origin=(-60, 6.227929353, 1), x_dir=(0, -1, 0), z_dir=(0, 0, 1))) as fillet5_piece_2:
        with BuildLine():
            CenterArc((3.630132521, -3), FILLET5_R, 90, 38.275653288)
            Line((1.77179602, -0.644881012), (0, 0))
            Line((0, 0), (3.630132521, 0))
        make_face()
    extrude(amount=15.075331304, mode=Mode.SUBTRACT)

    # Sketch17 → Cut-Extrude12 (cut, two sides: drawn at the far end of the back side and taken through both)
    with BuildSketch(Plane.ZY.offset(100).offset(-CUT_EXTRUDE12_DEPTH_BACK)):
        Polygon((6.6, 7.5), (7, 7.1), (7, 7.5), align=None)
    extrude(amount=CUT_EXTRUDE12_DEPTH + CUT_EXTRUDE12_DEPTH_BACK, mode=Mode.SUBTRACT)


solid = part.part
